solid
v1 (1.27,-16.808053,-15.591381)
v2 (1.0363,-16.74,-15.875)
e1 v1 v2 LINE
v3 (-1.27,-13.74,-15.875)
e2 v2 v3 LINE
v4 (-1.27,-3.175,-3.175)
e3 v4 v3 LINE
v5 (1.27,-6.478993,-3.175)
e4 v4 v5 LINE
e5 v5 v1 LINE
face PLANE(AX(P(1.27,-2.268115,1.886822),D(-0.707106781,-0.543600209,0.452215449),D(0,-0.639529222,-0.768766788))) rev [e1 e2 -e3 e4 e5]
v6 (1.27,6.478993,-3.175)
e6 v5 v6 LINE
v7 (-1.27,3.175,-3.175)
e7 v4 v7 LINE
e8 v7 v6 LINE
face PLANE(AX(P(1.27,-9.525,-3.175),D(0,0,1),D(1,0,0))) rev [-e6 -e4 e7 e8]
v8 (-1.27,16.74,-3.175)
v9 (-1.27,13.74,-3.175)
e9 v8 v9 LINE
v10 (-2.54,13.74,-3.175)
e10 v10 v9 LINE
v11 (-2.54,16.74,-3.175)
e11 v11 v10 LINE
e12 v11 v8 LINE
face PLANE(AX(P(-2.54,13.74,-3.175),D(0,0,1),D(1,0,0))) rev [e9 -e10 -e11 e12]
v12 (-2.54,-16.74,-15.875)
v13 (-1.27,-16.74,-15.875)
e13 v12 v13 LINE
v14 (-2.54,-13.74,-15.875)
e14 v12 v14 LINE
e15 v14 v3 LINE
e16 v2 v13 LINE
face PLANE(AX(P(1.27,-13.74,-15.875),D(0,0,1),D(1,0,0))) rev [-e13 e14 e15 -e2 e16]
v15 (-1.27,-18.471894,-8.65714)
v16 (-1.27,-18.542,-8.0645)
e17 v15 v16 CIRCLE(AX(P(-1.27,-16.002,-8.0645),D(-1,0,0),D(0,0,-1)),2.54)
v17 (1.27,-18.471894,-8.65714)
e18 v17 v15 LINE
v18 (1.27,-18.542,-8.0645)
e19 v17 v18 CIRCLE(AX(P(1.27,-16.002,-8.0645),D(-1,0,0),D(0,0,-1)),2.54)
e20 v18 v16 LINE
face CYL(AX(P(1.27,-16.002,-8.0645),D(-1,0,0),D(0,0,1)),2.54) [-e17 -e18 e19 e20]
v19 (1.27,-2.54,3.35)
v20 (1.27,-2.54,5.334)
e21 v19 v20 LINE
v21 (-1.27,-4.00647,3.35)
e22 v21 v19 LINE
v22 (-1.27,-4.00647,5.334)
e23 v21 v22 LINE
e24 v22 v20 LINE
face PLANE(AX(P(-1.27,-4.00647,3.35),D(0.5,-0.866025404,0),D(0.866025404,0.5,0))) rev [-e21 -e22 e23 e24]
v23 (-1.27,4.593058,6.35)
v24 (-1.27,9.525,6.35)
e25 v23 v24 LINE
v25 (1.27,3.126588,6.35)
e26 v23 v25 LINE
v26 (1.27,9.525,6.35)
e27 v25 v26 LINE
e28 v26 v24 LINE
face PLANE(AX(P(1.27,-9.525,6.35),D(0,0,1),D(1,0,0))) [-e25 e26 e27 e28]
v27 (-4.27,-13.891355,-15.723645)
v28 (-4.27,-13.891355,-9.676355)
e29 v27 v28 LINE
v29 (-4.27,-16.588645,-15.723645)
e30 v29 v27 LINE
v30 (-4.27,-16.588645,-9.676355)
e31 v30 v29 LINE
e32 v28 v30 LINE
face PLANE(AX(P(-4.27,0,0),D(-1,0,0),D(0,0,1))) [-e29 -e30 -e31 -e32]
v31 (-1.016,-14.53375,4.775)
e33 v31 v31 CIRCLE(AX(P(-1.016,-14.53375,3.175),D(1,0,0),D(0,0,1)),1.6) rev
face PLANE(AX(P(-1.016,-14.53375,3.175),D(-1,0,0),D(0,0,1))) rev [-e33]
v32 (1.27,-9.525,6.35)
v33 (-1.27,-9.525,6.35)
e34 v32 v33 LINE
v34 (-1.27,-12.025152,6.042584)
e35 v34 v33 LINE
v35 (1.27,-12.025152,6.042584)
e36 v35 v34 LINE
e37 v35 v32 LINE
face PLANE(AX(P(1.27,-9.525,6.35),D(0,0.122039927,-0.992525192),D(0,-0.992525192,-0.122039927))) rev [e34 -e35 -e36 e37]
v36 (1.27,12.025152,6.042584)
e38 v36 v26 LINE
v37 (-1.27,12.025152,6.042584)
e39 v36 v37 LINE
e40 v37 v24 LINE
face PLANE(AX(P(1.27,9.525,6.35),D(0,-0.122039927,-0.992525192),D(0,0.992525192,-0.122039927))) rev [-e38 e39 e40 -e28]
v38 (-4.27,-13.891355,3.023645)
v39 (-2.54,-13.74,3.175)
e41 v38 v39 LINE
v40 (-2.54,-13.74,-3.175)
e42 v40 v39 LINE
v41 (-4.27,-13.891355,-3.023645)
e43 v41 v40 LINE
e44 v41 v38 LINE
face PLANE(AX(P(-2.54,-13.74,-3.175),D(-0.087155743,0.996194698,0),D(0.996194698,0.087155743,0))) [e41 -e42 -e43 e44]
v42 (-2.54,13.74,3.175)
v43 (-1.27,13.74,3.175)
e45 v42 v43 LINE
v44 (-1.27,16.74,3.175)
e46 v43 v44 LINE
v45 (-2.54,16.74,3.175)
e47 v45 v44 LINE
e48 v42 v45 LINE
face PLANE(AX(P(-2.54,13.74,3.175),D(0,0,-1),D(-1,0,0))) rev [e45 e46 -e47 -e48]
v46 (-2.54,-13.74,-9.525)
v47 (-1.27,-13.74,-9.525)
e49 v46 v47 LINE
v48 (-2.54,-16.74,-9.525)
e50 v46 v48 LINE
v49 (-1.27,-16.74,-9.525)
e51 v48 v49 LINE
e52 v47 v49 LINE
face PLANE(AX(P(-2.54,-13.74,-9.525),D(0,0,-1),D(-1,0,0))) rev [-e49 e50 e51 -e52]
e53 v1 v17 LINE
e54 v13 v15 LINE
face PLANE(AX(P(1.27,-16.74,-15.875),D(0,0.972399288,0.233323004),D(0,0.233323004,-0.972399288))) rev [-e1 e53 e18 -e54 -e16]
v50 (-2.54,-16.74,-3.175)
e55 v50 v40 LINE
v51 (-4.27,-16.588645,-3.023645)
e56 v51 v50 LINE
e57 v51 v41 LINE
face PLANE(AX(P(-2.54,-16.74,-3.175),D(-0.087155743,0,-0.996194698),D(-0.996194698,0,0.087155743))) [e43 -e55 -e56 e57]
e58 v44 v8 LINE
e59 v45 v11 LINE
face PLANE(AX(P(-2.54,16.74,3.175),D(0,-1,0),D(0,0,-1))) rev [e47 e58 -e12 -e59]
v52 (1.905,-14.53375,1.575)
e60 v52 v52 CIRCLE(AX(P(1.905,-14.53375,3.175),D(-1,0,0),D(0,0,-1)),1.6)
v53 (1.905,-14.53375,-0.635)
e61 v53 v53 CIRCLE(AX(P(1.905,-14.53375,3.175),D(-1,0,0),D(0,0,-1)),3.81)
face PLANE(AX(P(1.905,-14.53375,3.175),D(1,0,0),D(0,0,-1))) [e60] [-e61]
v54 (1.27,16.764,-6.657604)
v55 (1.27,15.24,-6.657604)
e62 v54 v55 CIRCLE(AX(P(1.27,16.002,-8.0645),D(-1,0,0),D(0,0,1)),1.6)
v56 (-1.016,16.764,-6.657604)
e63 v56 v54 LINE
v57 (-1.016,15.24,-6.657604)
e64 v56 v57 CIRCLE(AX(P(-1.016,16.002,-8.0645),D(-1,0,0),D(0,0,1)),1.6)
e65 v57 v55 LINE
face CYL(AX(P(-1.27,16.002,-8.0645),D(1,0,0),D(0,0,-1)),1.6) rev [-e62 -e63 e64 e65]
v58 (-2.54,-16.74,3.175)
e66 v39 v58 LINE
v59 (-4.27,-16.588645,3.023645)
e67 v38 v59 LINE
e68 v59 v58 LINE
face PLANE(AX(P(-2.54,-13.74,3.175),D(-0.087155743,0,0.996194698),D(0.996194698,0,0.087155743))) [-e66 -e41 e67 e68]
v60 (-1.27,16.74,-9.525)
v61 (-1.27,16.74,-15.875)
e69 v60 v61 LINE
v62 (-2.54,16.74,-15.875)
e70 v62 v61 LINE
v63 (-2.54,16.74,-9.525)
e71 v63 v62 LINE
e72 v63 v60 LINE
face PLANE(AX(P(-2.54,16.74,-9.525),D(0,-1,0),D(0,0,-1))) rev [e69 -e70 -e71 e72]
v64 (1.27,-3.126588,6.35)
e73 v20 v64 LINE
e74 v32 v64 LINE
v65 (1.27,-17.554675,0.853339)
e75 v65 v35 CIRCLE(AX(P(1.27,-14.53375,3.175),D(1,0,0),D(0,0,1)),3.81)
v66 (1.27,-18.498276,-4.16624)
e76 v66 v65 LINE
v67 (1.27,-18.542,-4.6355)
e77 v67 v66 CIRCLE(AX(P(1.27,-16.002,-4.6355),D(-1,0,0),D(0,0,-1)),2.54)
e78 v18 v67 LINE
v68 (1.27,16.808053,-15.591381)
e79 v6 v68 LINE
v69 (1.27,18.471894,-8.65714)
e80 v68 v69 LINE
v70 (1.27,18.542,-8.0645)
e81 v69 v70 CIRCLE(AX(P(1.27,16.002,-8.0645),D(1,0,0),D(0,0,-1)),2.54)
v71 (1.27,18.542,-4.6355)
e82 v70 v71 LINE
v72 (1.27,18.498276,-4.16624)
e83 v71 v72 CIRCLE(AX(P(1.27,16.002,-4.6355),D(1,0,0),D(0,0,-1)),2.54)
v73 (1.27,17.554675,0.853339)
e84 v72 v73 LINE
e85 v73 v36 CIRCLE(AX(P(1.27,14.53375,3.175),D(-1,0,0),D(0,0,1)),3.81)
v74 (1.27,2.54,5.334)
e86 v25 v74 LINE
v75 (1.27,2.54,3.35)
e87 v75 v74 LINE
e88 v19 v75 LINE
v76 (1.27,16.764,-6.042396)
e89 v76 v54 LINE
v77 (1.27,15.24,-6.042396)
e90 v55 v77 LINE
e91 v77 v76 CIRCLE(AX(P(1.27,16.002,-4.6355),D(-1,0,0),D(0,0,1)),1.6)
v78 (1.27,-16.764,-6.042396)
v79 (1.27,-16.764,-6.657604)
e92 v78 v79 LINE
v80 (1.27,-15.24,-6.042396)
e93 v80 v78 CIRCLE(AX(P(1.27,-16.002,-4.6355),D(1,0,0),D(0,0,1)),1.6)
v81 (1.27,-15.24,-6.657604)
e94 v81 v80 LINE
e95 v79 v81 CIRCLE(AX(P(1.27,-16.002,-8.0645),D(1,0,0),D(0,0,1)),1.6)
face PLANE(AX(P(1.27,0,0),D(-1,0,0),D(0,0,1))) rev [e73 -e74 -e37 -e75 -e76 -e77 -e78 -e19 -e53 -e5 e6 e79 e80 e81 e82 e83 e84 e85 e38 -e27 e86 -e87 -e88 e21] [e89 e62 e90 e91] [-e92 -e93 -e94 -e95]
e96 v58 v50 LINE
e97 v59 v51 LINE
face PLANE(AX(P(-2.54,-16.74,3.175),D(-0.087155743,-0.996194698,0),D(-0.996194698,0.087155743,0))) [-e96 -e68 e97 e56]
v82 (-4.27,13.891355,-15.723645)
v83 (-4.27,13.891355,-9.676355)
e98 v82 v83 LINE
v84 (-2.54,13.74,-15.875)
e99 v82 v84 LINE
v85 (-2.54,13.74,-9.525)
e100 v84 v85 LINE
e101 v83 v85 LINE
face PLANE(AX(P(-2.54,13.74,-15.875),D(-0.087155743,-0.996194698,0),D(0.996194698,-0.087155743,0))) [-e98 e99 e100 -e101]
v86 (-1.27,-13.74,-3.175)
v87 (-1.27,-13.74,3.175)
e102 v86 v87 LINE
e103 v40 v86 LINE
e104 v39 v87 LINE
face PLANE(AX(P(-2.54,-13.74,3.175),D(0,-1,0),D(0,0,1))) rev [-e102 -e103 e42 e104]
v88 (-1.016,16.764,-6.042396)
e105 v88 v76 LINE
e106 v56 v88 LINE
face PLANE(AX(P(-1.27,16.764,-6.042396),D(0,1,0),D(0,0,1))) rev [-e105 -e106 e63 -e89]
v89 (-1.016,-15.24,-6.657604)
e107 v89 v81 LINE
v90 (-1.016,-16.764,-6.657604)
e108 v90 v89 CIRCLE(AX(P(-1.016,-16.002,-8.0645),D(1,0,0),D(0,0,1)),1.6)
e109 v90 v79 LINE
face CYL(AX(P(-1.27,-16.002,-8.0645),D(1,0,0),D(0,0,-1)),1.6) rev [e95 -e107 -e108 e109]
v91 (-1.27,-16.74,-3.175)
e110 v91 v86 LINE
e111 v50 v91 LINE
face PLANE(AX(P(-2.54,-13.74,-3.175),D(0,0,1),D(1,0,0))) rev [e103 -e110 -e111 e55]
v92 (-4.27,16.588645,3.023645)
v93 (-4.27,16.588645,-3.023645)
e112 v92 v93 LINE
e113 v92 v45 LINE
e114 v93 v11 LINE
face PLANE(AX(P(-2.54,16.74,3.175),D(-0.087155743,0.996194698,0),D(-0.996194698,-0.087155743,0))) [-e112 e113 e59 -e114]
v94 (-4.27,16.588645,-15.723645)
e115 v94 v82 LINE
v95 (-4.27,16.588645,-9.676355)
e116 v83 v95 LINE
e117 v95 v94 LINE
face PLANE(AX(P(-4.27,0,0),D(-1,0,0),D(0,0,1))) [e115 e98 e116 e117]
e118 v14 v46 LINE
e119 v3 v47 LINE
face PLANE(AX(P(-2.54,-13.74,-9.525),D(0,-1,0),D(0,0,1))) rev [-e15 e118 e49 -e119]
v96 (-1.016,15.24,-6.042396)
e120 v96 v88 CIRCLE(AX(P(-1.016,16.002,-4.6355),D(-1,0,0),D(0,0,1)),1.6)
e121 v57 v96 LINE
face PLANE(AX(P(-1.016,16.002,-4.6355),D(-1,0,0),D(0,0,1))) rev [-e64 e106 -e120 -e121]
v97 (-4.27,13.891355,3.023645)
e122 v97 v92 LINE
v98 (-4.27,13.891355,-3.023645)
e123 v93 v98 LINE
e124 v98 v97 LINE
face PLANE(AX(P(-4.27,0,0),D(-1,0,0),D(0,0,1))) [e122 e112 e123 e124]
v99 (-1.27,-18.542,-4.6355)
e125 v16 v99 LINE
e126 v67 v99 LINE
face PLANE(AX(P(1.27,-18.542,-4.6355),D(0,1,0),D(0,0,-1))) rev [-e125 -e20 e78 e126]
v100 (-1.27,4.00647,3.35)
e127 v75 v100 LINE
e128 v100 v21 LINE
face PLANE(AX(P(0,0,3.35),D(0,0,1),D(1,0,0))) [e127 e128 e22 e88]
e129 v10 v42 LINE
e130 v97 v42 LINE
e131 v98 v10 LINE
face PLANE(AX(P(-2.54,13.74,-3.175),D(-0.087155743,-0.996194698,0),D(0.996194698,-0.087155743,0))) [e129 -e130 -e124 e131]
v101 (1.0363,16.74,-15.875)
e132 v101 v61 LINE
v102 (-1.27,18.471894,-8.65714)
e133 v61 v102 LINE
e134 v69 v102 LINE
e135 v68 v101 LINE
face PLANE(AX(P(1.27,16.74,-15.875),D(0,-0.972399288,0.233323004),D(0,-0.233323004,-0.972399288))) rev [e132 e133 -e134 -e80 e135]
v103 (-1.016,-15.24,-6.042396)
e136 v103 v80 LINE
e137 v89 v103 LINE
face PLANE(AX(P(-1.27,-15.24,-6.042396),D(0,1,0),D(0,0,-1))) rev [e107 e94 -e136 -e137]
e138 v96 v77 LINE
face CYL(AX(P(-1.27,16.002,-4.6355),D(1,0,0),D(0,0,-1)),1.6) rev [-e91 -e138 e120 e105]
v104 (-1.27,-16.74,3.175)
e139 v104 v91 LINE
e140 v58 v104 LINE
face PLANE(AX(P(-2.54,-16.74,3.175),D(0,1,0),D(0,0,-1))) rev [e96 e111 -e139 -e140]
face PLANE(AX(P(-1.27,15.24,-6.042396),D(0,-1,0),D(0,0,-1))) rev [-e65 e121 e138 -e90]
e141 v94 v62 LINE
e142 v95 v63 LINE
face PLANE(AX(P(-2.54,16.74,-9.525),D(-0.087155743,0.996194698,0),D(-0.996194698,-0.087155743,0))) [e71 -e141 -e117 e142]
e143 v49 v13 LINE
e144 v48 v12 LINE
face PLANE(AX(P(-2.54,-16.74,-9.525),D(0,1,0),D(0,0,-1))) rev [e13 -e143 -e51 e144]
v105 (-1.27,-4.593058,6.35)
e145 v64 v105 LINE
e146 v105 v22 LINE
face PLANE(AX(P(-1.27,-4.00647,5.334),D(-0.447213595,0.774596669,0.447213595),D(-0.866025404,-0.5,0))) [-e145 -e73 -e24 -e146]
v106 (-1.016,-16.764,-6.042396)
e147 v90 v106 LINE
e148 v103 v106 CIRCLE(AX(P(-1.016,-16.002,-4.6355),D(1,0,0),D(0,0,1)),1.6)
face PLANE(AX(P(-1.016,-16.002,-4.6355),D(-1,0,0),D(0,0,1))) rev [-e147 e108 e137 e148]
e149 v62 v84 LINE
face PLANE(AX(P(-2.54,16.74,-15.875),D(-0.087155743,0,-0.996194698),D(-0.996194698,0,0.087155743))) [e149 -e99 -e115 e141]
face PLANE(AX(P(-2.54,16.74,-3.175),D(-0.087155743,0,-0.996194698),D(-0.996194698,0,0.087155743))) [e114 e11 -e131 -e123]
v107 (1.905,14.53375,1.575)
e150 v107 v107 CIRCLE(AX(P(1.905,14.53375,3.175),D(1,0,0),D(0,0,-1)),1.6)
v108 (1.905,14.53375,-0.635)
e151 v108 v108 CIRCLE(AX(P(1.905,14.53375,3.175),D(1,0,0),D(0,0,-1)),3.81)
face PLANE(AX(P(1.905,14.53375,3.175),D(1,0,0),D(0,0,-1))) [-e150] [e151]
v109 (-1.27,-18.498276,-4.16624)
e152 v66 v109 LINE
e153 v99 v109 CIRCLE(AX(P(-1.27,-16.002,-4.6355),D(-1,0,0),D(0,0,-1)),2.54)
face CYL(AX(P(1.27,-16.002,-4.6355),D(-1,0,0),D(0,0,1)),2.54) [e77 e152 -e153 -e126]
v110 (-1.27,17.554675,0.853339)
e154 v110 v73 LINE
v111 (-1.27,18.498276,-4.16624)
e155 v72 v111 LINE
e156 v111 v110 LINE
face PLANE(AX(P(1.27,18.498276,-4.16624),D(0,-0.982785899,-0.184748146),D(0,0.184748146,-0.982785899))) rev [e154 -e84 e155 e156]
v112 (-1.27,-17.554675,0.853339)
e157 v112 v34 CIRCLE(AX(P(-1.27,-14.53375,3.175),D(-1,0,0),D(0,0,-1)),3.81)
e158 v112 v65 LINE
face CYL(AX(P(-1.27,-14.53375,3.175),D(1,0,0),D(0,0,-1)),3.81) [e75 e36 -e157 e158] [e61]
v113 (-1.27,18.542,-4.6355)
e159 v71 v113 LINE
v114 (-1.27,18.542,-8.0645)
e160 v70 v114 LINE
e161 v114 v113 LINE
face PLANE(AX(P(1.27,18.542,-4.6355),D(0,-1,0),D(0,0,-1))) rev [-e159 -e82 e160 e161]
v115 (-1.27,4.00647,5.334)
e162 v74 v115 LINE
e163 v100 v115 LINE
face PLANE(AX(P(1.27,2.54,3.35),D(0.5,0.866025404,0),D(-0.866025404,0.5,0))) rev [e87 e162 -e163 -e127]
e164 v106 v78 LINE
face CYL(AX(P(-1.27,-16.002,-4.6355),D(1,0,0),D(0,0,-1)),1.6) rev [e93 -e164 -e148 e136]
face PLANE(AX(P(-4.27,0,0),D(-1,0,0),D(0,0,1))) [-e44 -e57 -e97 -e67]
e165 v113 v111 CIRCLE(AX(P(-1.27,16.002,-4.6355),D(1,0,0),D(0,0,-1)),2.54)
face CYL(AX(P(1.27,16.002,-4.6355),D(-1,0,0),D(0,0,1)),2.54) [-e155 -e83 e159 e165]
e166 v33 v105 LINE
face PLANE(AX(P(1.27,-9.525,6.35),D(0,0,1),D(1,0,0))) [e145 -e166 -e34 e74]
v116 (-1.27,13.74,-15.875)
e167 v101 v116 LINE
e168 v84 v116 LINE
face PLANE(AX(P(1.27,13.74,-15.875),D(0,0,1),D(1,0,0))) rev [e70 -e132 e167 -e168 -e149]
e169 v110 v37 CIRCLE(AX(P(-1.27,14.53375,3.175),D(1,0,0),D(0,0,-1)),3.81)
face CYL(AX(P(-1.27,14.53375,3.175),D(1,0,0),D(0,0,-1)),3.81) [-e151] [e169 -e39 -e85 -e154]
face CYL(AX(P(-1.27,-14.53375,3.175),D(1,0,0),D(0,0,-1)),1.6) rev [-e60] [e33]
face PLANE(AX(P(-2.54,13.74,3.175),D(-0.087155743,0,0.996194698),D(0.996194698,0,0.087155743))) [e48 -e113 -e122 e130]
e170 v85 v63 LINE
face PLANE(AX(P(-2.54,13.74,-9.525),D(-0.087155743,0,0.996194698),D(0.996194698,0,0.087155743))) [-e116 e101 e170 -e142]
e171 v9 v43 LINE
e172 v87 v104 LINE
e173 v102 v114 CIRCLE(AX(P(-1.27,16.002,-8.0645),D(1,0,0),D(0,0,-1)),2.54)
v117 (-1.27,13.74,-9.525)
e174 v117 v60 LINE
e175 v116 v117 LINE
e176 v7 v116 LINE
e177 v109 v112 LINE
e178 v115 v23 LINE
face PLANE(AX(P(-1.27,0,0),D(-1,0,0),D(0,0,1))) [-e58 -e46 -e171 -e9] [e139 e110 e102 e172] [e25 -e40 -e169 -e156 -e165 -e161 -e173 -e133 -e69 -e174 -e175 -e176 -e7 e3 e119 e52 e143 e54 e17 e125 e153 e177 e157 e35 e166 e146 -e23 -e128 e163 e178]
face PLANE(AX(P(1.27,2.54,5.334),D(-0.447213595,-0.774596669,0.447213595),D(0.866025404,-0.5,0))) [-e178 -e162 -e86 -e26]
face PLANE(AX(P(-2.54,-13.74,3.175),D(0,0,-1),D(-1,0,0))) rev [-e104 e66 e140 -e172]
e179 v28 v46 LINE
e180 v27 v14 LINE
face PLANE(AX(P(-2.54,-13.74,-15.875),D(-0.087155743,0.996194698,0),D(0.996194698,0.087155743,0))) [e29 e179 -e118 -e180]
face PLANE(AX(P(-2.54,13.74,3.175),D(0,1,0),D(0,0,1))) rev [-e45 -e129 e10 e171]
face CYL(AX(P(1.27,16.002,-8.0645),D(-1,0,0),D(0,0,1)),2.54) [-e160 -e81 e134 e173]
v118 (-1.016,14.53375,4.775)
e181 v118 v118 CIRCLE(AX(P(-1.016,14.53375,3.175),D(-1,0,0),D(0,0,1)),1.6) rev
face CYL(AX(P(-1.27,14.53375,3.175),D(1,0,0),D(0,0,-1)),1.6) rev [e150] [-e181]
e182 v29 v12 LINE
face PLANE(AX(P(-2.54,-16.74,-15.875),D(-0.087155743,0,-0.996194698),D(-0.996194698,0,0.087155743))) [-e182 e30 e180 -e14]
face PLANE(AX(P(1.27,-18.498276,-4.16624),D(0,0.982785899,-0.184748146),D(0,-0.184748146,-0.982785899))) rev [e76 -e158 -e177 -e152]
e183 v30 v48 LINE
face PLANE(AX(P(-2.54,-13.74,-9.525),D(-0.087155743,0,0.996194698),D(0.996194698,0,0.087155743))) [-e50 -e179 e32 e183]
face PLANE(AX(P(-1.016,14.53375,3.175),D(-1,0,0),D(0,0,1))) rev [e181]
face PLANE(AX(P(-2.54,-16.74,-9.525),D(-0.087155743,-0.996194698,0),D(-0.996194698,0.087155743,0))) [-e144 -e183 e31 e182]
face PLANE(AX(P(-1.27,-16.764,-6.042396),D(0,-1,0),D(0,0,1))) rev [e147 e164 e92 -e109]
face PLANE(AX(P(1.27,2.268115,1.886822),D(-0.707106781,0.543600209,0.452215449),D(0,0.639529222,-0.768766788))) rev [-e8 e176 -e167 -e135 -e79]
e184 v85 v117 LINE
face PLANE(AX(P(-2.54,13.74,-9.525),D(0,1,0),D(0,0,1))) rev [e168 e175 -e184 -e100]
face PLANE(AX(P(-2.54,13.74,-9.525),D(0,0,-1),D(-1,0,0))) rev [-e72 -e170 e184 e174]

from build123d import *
from OCP.BRepFilletAPI import BRepFilletAPI_MakeChamfer

# Parameters (mm, degrees)
DOWELSUPPORT_DEPTH       = 1.905
DOWELSUPPORT_DEPTH_BACK  = 1.27
SKETCH3_R                = 3.81
SKETCH5_W                = 9.525
SKETCH5_H                = 19.05
SLIDERDOWELSUPPORT_DEPTH = 1.27
STRINGDOWELSUPPORT_DEPTH = 1.27
SKETCH9_W                = 6.35
SKETCH9_H                = 3
TABSUPPORT_DEPTH         = 1.27
INTERSUPPORT_DEPTH       = 1.27
DOWELHOLES_DEPTH         = 25.48367648
DOWELHOLES_DEPTH_BACK    = 25.48367648
SKETCH11_R               = 1.600000102
BOSS_EXTRUDE1_START      = -1.27
SKETCH11_2_R             = 1.600000102
BOSS_EXTRUDE1_DEPTH      = 0.254
SKETCH14_W               = 6.35
SKETCH14_H               = 3
TABBASE_DEPTH            = 1.27
SKETCH15_W               = 6.35
SKETCH15_H               = 3
TABDRAFT_DEPTH           = 1.73
TABDRAFT_DRAFT           = 5
TABDRAFT_PROFILE_2_DEPTH = 1.73
TABDRAFT_PROFILE_2_DRAFT = 5
CHAMFER1_SIZE            = 2.54
CUT_EXTRUDE2_DEPTH       = 3
CHAMFER2_SIZE            = 0.508
CHAMFER2_SIZE2           = 1.016


with BuildPart() as part:
    # Sketch3 → DowelSupport (new, two sides: drawn at the far end of the back side and taken through both)
    with BuildSketch(Plane(origin=(0, 0, 0), x_dir=(0, 0, -1), z_dir=(1, 0, 0)).offset(-DOWELSUPPORT_DEPTH_BACK)):
        with Locations((-3.175, 14.53375)):
            Circle(SKETCH3_R)
    extrude(amount=DOWELSUPPORT_DEPTH + DOWELSUPPORT_DEPTH_BACK)



with BuildPart() as body_2:
    # Sketch5 → SliderDowelSupport (new, symmetric)
    with BuildSketch(Plane(origin=(0, 0, 0), x_dir=(0, 0, -1), z_dir=(1, 0, 0))):
        with Locations((-1.5875, 0)):
            Rectangle(SKETCH5_W, SKETCH5_H)
    extrude(amount=SLIDERDOWELSUPPORT_DEPTH, both=True)


with BuildPart() as body_3:
    # Sketch8 → StringDowelSupport (new, symmetric)
    with BuildSketch(Plane(origin=(0, 0, 0), x_dir=(0, 0, -1), z_dir=(1, 0, 0))):
        with BuildLine():
            Line((4.6355, 18.542), (8.0645, 18.542))
            ThreePointArc((8.0645, 18.542), (10.6045, 16.002), (8.0645, 13.462))
            Line((8.0645, 13.462), (4.6355, 13.462))
            ThreePointArc((4.6355, 13.462), (2.0955, 16.002), (4.6355, 18.542))
        make_face()
    extrude(amount=STRINGDOWELSUPPORT_DEPTH, both=True)


with BuildPart() as part_1:
    add(part.part)

    add(body_3.part)  # TabSupport merges body 3
    # Sketch9 → TabSupport (add, symmetric)
    with BuildSketch(Plane(origin=(0, 0, 0), x_dir=(0, 0, -1), z_dir=(1, 0, 0))):
        with Locations((0, 15.24)):
            Rectangle(SKETCH9_W, SKETCH9_H)
        with Locations((12.7, 15.24)):
            Rectangle(SKETCH9_W, SKETCH9_H)
    extrude(amount=TABSUPPORT_DEPTH, both=True)


    add(body_2.part)  # InterSupport merges body 2
    # Sketch10 → InterSupport (add, symmetric)
    with BuildSketch(Plane(origin=(0, 0, 0), x_dir=(0, 0, -1), z_dir=(1, 0, 0))):
        Polygon((-6.35, 9.525), (-5.696013987, 14.843731414), (-3.644260291, 17.030026182), (4.166239709, 18.498276182), (8.657140431, 18.471894192), (15.875, 16.74), (15.875, 13.74), (3.175, 3.175), (3.175, 9.525), align=None)
    extrude(amount=INTERSUPPORT_DEPTH, both=True)

    # Sketch11 → DowelHoles (cut, two sides: drawn at the far end of the back side and taken through both)
    with BuildSketch(Plane(origin=(0, 0, 0), x_dir=(0, 0, -1), z_dir=(1, 0, 0)).offset(-DOWELHOLES_DEPTH_BACK)):
        with Locations((-3.175, 14.53375)):
            Circle(SKETCH11_R)
        with BuildLine():
            Line((6.04239599, 15.24), (6.65760401, 15.24))
            ThreePointArc((6.65760401, 15.24), (9.664500102, 16.002), (6.65760401, 16.764))
            Line((6.65760401, 16.764), (6.04239599, 16.764))
            ThreePointArc((6.04239599, 16.764), (3.035499898, 16.002), (6.04239599, 15.24))
        make_face()
    extrude(amount=DOWELHOLES_DEPTH + DOWELHOLES_DEPTH_BACK, mode=Mode.SUBTRACT)

    # Sketch11<2> → Boss-Extrude1 (add)
    with BuildSketch(Plane(origin=(0, 0, 0), x_dir=(0, 0, -1), z_dir=(1, 0, 0)).offset(BOSS_EXTRUDE1_START)):
        with BuildLine():
            Line((6.04239599, 15.24), (6.65760401, 15.24))
            ThreePointArc((6.65760401, 15.24), (9.664500102, 16.002), (6.65760401, 16.764))
            Line((6.65760401, 16.764), (6.04239599, 16.764))
            ThreePointArc((6.04239599, 16.764), (3.035499898, 16.002), (6.04239599, 15.24))
        make_face()
        with Locations((-3.175, 14.53375)):
            Circle(SKETCH11_2_R)
    extrude(amount=BOSS_EXTRUDE1_DEPTH)

    # Sketch14 → TabBase (add)
    with BuildSketch(Plane.ZY.offset(1.27)):
        with Locations((-12.7, 15.24)):
            Rectangle(SKETCH14_W, SKETCH14_H)
        with Locations((0, 15.24)):
            Rectangle(SKETCH14_W, SKETCH14_H)
    extrude(amount=TABBASE_DEPTH)


with BuildPart() as tabdraft_tool:
    # Sketch15 → TabDraft (with draft: the straight prism first)
    with BuildSketch(Plane.ZY.offset(2.54)):
        with Locations((0, 15.24)):
            Rectangle(SKETCH15_W, SKETCH15_H)
    extrude(amount=TABDRAFT_DEPTH)
    # TabDraft: the draft: its side faces are tilted about the plane it starts from
    tabdraft_sides = [tabdraft_tool.faces().sort_by_distance(p)[0] for p in [
        (-3.405, 15.24, -3.175),
        (-3.405, 13.74, 0),
        (-3.405, 15.24, 3.175),
        (-3.405, 16.74, 0),
    ]]
    draft(tabdraft_sides, Plane.ZY.offset(2.54), TABDRAFT_DRAFT)


with BuildPart() as part_2:
    add(part_1.part)

    # TabDraft: add tabdraft_tool
    add(tabdraft_tool.part)


with BuildPart() as tabdraft_profile_2_tool:
    # Sketch15 → TabDraft profile 2 (with draft: the straight prism first)
    with BuildSketch(Plane.ZY.offset(2.54)):
        with Locations((-12.7, 15.24)):
            Rectangle(SKETCH15_W, SKETCH15_H)
    extrude(amount=TABDRAFT_PROFILE_2_DEPTH)
    # TabDraft profile 2: the draft: its side faces are tilted about the plane it starts from
    tabdraft_profile_2_sides = [tabdraft_profile_2_tool.faces().sort_by_distance(p)[0] for p in [
        (-3.405, 15.24, -15.875),
        (-3.405, 13.74, -12.7),
        (-3.405, 15.24, -9.525),
        (-3.405, 16.74, -12.7),
    ]]
    draft(tabdraft_profile_2_sides, Plane.ZY.offset(2.54), TABDRAFT_PROFILE_2_DRAFT)


with BuildPart() as part_3:
    add(part_2.part)

    # TabDraft profile 2: add tabdraft_profile_2_tool
    add(tabdraft_profile_2_tool.part)

    # Chamfer1
    chamfer1_edges = [part_3.edges().sort_by_distance(p)[0] for p in [
        (1.27, 8.4575, -9.525),
    ]]
    chamfer(chamfer1_edges, length=CHAMFER1_SIZE - 0.0001)  # a hair under: the kernel refuses the full size

    # Mirror1: part across plane


with BuildPart() as part_4:
    add(part_3.part)
    add(part_3.part.mirror(Plane.ZX))

    # Sketch17 → Cut-Extrude2 (cut)
    with BuildSketch(Plane.XY.offset(6.35)):
        Polygon((-1.27, -4.006469684), (1.27, -2.54), (1.27, 2.54), (-1.27, 4.006469684), align=None)
    extrude(amount=-CUT_EXTRUDE2_DEPTH, mode=Mode.SUBTRACT)

    # Chamfer2: one chamfer whose edges measure the first distance from different faces: ONE call of the kernel's chamfer builder (chamfer() names one face for all edges)
    chamfer2_edges_1 = [part_4.edges().sort_by_distance(p)[0] for p in [
        (0, -3.273234842, 6.35),
    ]]
    chamfer2_side_1 = [part_4.faces().sort_by_distance(p)[0] for p in [
        (0.049650417, -6.38478458, 6.35),
    ]]
    chamfer2_edges_2 = [part_4.edges().sort_by_distance(p)[0] for p in [
        (0, 3.273234842, 6.35),
    ]]
    chamfer2_side_2 = [part_4.faces().sort_by_distance(p)[0] for p in [
        (0.049650417, 6.38478458, 6.35),
    ]]
    chamfer2 = BRepFilletAPI_MakeChamfer(part_4.part.solid().wrapped)
    for e in chamfer2_edges_1:
        chamfer2.Add(CHAMFER2_SIZE, CHAMFER2_SIZE2, e.wrapped, chamfer2_side_1[0].wrapped)  # the first distance lies on this face
    for e in chamfer2_edges_2:
        chamfer2.Add(CHAMFER2_SIZE, CHAMFER2_SIZE2, e.wrapped, chamfer2_side_2[0].wrapped)  # the first distance lies on this face
    add(Compound.cast(chamfer2.Shape()), mode=Mode.REPLACE)


solid = part_4.part
